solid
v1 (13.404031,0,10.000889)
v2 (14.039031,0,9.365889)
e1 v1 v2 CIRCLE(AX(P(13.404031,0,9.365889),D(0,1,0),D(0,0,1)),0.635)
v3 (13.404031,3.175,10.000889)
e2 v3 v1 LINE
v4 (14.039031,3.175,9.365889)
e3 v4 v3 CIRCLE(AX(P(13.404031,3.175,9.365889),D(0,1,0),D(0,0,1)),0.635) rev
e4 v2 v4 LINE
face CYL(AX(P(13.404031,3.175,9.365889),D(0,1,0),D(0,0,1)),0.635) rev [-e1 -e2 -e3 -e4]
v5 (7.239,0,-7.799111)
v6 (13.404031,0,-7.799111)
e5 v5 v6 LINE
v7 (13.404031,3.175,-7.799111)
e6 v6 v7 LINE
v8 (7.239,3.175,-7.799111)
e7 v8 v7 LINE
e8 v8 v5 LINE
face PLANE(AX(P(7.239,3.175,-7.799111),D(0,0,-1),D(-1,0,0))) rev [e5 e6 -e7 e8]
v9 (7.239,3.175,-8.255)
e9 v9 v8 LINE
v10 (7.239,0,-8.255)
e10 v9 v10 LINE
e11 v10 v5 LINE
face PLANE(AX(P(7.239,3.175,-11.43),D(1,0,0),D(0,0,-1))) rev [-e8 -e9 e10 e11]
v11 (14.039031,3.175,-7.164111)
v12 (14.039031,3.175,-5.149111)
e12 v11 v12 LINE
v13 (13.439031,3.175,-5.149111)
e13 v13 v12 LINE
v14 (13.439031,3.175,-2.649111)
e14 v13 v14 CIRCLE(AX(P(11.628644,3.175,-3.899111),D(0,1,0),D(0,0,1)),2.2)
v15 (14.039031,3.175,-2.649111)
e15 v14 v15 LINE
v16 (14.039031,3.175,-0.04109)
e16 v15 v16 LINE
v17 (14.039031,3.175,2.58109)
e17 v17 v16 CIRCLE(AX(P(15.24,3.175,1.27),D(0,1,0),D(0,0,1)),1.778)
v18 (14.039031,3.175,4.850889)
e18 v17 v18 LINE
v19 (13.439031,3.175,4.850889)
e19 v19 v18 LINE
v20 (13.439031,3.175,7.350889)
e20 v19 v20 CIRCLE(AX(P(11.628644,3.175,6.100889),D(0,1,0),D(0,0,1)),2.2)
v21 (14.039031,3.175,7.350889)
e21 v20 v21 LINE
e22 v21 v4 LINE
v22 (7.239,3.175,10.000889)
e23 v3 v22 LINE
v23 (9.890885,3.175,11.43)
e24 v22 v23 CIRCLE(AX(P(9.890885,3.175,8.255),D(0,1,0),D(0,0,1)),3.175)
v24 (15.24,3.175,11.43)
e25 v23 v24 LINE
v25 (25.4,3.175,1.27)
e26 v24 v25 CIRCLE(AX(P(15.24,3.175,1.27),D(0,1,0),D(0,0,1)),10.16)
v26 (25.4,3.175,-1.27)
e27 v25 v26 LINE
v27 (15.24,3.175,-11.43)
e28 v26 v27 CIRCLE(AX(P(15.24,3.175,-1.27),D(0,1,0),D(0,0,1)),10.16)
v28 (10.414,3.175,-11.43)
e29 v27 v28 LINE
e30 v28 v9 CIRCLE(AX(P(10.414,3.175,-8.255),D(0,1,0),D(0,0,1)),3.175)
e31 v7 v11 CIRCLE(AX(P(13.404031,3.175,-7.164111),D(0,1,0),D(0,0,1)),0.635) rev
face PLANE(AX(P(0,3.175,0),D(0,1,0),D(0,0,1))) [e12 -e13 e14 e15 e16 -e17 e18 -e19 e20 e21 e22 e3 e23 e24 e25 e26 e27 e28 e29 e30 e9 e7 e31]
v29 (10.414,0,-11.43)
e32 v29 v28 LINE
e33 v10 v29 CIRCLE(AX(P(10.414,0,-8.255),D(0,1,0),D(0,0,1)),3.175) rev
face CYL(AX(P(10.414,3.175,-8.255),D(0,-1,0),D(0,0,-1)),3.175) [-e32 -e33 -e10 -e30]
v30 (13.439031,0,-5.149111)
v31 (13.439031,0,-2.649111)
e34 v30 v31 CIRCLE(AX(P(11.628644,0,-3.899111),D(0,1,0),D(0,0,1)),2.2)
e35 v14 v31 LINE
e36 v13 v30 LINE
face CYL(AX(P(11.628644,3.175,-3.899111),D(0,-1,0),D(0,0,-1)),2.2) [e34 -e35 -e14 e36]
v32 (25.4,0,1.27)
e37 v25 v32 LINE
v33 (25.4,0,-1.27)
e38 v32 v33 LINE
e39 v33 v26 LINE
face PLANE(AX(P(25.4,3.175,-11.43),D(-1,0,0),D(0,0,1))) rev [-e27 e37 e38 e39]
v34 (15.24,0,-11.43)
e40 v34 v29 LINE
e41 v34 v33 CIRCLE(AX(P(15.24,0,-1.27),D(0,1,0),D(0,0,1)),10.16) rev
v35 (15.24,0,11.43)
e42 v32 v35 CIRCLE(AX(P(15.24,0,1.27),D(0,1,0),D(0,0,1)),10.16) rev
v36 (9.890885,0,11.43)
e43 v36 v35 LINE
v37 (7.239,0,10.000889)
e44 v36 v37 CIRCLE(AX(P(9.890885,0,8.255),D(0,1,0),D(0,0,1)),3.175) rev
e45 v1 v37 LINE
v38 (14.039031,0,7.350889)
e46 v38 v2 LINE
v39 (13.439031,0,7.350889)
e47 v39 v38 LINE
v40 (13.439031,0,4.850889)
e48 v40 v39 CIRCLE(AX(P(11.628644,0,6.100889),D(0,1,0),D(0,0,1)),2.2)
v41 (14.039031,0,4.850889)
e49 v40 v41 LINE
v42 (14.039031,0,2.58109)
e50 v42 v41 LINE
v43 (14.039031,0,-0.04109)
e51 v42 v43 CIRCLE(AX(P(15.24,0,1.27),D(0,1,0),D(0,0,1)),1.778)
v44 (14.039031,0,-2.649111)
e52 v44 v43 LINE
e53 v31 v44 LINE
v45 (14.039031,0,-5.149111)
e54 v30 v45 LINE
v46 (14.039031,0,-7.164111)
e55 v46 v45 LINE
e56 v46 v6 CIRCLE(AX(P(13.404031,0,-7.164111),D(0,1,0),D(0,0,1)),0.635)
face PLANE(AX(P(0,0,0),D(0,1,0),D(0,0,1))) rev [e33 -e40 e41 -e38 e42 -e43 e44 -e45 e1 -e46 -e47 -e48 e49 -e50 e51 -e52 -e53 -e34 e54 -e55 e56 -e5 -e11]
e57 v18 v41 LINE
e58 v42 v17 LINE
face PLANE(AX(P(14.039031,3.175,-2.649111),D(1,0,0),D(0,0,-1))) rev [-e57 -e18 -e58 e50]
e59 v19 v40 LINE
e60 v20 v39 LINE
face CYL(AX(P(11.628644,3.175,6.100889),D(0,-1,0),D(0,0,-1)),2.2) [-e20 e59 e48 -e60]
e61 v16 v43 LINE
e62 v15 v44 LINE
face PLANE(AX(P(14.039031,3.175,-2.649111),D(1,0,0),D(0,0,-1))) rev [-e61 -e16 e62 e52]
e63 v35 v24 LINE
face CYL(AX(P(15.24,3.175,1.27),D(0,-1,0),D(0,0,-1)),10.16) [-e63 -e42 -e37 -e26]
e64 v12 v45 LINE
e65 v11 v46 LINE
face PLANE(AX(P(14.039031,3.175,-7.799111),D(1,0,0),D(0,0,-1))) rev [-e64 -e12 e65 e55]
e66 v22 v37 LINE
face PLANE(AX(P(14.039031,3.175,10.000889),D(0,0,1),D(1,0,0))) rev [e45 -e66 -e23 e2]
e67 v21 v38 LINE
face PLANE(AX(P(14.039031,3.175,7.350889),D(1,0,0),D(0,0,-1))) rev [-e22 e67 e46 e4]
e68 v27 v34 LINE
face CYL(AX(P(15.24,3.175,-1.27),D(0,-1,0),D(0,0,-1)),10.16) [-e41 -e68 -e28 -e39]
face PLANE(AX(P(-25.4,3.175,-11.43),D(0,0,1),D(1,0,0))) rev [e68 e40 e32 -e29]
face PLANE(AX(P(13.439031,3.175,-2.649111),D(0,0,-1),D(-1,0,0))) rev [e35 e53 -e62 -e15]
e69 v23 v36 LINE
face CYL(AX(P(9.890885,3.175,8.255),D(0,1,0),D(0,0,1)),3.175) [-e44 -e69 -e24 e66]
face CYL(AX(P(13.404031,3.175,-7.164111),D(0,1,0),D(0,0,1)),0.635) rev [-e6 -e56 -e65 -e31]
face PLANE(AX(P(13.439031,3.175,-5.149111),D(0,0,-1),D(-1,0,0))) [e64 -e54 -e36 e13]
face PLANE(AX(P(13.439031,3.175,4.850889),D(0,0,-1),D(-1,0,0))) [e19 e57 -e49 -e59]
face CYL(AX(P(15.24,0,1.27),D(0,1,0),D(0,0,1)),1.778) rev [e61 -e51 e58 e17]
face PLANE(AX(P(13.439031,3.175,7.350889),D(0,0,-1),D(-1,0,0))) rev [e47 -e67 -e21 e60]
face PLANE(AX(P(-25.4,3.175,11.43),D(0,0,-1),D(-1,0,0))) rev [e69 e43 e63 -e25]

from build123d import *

# Parameters (mm, degrees)
SKETCH1_W           = 50.8
SKETCH1_H           = 22.86
BOSS_EXTRUDE1_DEPTH = 3.175
FILLET1_R           = 10.16
SKETCH3_R           = 1.778
CUT_EXTRUDE1_DEPTH  = 29.033649869
FILLET3_R           = 10.16
CUT_EXTRUDE3_DEPTH  = 29.033649869
FILLET4_R           = 0.635
FILLET5_R           = 3.175


with BuildPart() as part:
    # Sketch1 → Boss-Extrude1 (new body)
    with BuildSketch(Plane(origin=(0, 0, 0), x_dir=(1, 0, 0), z_dir=(0, 1, 0))):
        Rectangle(SKETCH1_W, SKETCH1_H)
    extrude(amount=BOSS_EXTRUDE1_DEPTH)

    # Fillet1
    fillet1_edges = [part.edges().sort_by_distance(p)[0] for p in [
        (25.4, 1.5875, 11.43),
        (-25.4, 1.5875, 11.43),
    ]]
    fillet(fillet1_edges, radius=FILLET1_R)

    # Sketch3 → Cut-Extrude1 (cut, through all)
    with BuildSketch(Plane(origin=(0, 3.175, 0), x_dir=(1, 0, 0), z_dir=(0, 1, 0))):
        with Locations(Location((15.24, -1.27, 0), (0, 0, 270))):
            Circle(SKETCH3_R)
        with Locations(Location((-3.81, -1.27, 0), (0, 0, 270))):
            Circle(SKETCH3_R)
    extrude(amount=-CUT_EXTRUDE1_DEPTH, mode=Mode.SUBTRACT)

    # Fillet3
    fillet3_edges = [part.edges().sort_by_distance(p)[0] for p in [
        (-25.4, 1.5875, -11.43),
        (25.4, 1.5875, -11.43),
    ]]
    fillet(fillet3_edges, radius=FILLET3_R)

    # Sketch5 → Cut-Extrude3 (cut, through all)
    with BuildSketch(Plane.XZ):
        with BuildLine():
            Line((7.239, -11.43), (7.239, -7.799110591))
            Line((7.239, -7.799110591), (14.039031064, -7.799110591))
            Line((14.039031064, -7.799110591), (14.039031064, -5.149110591))
            Line((14.039031064, -5.149110591), (13.439031064, -5.149110591))
            ThreePointArc((13.439031064, -5.149110591), (9.428644365, -3.899110591), (13.439031064, -2.649110591))
            Line((13.439031064, -2.649110591), (14.039031064, -2.649110591))
            Line((14.039031064, -2.649110591), (14.039031064, 4.850889409))
            Line((14.039031064, 4.850889409), (13.439031064, 4.850889409))
            ThreePointArc((13.439031064, 4.850889409), (9.428644366, 6.100889409), (13.439031064, 7.350889409))
            Line((13.439031064, 7.350889409), (14.039031064, 7.350889409))
            Line((14.039031064, 7.350889409), (14.039031064, 10.000889409))
            Line((14.039031064, 10.000889409), (7.239, 10.000889409))
            Line((7.239, 10.000889409), (7.239, 11.43))
            Line((7.239, 11.43), (-25.4, 11.43))
            Line((-25.4, 11.43), (-25.4, -11.43))
            Line((-25.4, -11.43), (7.239, -11.43))
        make_face()
    extrude(amount=-CUT_EXTRUDE3_DEPTH, mode=Mode.SUBTRACT)

    # Fillet4
    fillet4_edges = [part.edges().sort_by_distance(p)[0] for p in [
        (14.039031064, 1.5875, 10.000889409),
        (14.039031064, 1.5875, -7.799110591),
    ]]
    fillet(fillet4_edges, radius=FILLET4_R)

    # Fillet5
    # the kernel refuses this fillet: 3.175 mm, written as the material it takes off along each edge
    with BuildSketch(Plane(origin=(7.239, -7.9375, -11.43), x_dir=(1, 0, 0), z_dir=(0, 1, 0))) as fillet5_piece_1:
        with BuildLine():
            CenterArc((FILLET5_R, -FILLET5_R), FILLET5_R, 90, 90)
            Line((0, -FILLET5_R), (-FILLET5_R * 0.02, -FILLET5_R))
            Line((-FILLET5_R * 0.02, -FILLET5_R), (-FILLET5_R * 0.02, FILLET5_R * 0.02))
            Line((-FILLET5_R * 0.02, FILLET5_R * 0.02), (FILLET5_R, FILLET5_R * 0.02))
            Line((FILLET5_R, FILLET5_R * 0.02), (FILLET5_R, 0))
        make_face()
    extrude(amount=19.05, mode=Mode.SUBTRACT)
    with BuildSketch(Plane(origin=(7.239, -6.629713028, 11.43), x_dir=(1.52265132002689e-12, 0, -1.0), z_dir=(0, 1, 0))) as fillet5_piece_2:
        with BuildLine():
            CenterArc((3.175, -2.651885211), FILLET5_R, 123.359221801, 56.640778199)
            Line((0, -2.651885211), (-0.0635, -2.651885211))
            Line((-0.0635, -2.651885211), (-0.0635, 0))
            Line((-0.0635, 0), (0, 0.0635))
            ThreePointArc((0, 0.0635), (0.714555296, 0.0635), (1.394192803, 0.053037704))
            Line((1.394192803, 0.053037704), (1.429110591, 0))
        make_face()
    extrude(amount=16.434426055, mode=Mode.SUBTRACT)


solid = part.part
